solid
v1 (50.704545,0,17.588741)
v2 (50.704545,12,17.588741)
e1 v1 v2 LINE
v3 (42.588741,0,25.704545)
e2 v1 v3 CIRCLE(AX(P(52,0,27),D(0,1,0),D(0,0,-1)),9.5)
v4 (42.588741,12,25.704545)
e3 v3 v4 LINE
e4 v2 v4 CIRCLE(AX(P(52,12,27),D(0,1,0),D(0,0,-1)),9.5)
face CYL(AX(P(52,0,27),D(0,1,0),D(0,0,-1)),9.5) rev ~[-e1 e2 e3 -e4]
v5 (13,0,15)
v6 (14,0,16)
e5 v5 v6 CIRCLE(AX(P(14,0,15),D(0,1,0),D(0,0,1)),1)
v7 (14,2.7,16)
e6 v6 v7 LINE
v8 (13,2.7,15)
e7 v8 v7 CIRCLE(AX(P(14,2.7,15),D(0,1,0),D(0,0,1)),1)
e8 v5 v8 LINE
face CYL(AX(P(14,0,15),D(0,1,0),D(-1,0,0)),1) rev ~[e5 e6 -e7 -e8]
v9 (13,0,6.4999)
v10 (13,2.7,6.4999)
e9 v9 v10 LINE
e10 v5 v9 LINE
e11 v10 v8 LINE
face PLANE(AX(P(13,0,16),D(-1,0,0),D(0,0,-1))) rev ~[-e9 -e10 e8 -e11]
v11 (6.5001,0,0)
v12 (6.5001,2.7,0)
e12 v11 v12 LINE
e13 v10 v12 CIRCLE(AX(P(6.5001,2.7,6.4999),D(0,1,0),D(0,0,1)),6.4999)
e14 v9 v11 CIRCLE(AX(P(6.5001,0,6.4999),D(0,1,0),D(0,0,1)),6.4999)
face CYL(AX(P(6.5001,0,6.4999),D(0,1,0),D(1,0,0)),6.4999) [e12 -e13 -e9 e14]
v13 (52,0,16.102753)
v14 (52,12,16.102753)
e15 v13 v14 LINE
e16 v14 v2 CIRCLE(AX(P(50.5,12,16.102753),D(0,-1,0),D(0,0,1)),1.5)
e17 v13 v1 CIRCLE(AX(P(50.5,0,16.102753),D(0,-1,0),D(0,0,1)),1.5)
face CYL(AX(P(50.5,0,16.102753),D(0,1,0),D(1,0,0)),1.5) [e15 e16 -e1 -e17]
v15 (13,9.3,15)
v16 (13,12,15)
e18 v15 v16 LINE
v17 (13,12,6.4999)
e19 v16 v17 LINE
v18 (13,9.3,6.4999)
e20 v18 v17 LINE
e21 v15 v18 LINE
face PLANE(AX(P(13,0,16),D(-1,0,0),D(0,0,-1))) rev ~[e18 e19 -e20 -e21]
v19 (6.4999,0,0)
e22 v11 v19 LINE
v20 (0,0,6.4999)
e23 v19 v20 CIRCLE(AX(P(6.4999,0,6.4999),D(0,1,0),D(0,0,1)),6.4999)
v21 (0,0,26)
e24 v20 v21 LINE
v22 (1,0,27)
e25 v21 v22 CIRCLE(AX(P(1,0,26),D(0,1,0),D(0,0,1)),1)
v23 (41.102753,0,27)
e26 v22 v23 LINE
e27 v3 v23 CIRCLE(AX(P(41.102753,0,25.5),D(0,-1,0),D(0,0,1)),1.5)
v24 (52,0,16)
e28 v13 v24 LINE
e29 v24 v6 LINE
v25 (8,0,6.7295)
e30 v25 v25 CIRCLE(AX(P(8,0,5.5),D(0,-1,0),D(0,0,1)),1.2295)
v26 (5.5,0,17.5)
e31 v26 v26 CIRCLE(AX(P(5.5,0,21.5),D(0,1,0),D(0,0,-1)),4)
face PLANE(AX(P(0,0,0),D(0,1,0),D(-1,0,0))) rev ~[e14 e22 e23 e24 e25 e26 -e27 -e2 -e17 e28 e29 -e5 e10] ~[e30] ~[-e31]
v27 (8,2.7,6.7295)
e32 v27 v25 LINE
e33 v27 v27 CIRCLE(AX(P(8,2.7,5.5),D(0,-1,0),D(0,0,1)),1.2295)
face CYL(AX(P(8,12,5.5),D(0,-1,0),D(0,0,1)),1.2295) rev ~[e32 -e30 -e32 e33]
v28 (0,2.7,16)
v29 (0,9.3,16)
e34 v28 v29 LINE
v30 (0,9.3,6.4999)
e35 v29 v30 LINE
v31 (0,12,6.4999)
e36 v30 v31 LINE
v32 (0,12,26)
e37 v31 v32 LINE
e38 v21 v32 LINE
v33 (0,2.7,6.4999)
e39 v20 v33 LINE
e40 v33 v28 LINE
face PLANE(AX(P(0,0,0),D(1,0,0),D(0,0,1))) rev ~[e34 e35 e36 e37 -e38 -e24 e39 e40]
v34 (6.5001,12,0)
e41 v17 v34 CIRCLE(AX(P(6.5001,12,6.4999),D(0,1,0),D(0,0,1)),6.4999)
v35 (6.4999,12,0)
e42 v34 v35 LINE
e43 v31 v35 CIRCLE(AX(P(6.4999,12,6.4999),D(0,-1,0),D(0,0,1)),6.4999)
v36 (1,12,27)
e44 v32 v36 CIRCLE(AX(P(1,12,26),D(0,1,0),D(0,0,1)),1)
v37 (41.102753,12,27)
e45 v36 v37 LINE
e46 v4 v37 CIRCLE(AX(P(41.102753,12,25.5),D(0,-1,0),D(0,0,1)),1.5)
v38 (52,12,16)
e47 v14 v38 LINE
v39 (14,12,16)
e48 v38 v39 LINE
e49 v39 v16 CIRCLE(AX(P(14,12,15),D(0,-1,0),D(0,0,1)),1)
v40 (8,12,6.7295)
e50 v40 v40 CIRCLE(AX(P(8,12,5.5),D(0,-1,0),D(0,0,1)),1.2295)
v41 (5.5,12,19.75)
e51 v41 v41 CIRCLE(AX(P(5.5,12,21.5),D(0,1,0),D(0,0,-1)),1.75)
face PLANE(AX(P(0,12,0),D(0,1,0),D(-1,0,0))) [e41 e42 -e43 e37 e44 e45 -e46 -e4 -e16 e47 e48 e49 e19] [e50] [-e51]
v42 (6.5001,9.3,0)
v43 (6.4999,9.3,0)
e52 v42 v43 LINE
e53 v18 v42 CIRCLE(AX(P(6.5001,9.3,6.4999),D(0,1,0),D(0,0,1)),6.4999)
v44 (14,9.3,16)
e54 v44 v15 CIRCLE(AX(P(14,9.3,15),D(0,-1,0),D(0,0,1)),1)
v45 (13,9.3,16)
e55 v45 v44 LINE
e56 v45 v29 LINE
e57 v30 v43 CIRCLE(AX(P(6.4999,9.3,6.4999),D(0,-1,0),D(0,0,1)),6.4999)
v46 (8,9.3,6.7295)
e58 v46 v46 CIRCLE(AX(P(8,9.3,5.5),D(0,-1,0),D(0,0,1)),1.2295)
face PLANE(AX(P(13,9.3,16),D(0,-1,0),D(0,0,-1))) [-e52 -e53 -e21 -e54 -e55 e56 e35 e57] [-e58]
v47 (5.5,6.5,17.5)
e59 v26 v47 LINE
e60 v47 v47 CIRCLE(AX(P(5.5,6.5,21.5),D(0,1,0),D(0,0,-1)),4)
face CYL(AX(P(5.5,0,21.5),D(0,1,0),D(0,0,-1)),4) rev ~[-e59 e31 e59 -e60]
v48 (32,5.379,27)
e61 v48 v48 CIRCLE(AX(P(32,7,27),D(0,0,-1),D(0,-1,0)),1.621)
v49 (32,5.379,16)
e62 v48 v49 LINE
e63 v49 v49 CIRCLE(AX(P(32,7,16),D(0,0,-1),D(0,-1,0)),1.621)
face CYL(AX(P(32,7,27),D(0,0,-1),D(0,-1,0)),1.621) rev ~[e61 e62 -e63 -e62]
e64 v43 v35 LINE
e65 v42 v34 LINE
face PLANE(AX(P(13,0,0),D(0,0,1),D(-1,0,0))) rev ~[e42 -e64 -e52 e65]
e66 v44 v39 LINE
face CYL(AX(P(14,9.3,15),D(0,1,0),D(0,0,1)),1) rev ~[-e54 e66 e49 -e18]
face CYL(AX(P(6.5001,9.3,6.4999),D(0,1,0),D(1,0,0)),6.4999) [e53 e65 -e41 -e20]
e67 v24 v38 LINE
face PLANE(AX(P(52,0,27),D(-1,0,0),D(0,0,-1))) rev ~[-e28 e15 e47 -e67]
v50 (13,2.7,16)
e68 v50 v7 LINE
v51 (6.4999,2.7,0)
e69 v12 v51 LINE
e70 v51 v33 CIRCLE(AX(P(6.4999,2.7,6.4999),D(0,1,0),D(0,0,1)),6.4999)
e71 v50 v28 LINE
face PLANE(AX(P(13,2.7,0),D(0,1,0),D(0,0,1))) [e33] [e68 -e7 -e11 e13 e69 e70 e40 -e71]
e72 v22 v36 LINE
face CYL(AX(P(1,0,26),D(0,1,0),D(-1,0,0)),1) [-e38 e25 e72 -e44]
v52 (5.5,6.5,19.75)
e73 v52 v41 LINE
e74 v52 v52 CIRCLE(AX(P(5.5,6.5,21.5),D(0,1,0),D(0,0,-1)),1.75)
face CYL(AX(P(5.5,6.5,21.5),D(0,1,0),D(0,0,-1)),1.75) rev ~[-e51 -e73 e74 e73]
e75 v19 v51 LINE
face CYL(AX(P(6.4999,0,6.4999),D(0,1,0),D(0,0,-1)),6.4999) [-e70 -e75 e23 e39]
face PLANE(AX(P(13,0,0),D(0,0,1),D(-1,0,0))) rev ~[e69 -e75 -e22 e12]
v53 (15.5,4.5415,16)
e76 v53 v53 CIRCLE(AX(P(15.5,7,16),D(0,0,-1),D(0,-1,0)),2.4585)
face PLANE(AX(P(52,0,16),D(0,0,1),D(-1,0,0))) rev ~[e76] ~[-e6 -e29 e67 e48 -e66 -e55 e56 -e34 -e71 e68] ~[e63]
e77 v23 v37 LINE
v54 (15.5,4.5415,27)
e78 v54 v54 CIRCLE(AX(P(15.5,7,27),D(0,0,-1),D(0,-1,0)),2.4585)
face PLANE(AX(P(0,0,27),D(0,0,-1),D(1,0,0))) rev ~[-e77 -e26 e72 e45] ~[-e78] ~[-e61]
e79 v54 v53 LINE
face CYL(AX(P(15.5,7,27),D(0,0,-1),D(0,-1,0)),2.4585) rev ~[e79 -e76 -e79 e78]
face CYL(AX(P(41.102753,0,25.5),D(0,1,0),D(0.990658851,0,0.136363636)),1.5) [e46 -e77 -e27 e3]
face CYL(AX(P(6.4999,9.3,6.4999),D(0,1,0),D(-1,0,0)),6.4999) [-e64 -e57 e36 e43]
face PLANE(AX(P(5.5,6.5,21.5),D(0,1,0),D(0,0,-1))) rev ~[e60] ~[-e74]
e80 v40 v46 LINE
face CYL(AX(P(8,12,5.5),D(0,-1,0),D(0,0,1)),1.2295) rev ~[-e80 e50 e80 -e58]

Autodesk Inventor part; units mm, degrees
ref_plane "YZ Plane" through (0, 0, 0) normal (1, 0, 0) x (0, 1, 0)
ref_plane "XZ Plane" through (0, 0, 0) normal (0, 1, 0) x (-1, 0, 0)
ref_plane "XY Plane" through (0, 0, 0) normal (0, 0, 1) x (1, 0, 0)
sketch "Sketch1" plane through (0, 0, 0) normal (0, 1, 0) x (-1, 0, 0)
  line L0 (0, 0) -> (0, 27)
  line L1 (0, 27) -> (-52, 27)
  line L2 (-52, 27) -> (-52, 16)
  line L3 (-52, 16) -> (-13, 16)
  line L4 (-13, 16) -> (-13, 0)
  line L5 (-13, 0) -> (0, 0)
  dimension "d0" = 27
  dimension "d1" = 52
  dimension "d2" = 11
  dimension "d3" = 39
  dimension "d57" = 16
extrude "Extrusion1" add sketch "Sketch1" along normal blind 12
sketch "Sketch2" plane through (0, 0, 0) normal (0, -1, 0) x (1, 0, 0)
  line L0 (0, 0) -> (0, 27) projected
  line L1 (0, 27) -> (52, 27) projected
  point P0 (5.5, 21.5)
  dimension "d6" = 5.5
  dimension "d7" = 5.5
hole "Hole1" at (5.5, 0, 21.5) direction (0, 1, 0) diameter 3.5 end through all counterbore diameter 8 counterbore depth 6.5
sketch "Sketch3" plane through (0, 12, 0) normal (0, 1, 0) x (1, 0, 0)
  line L0 (0, 0) -> (0, -27) projected
  line L1 (13, 0) -> (0, 0) projected
  point P0 (8, -5.5)
  dimension "d15" = 8
  dimension "d16" = 5.5
hole "Hole2" at (8, 12, 5.5) direction (0, -1, 0) diameter 2.459 end through all thread size "M3x0.5" class "6H" standard "ISO Metric profile"
sketch "Sketch4" plane through (13, 0, 16) normal (1, 0, 0) x (0, 0, -1)
  line L0 (0, 0) -> (0, 12) projected
  line L1 (16, 2.7) -> (0, 2.7)
  line L2 (0, 2.7) -> (0, 9.3)
  line L3 (0, 9.3) -> (16, 9.3)
  line L4 (16, 9.3) -> (16, 2.7)
  line L5 (0, 0) -> (16, 0) projected
  line L6 (0, 12) -> (16, 12) projected
  dimension "d58" = 12
  dimension "d59" = 6.6
  dimension "d60" = 2.7
extrude "Extrusion2" cut sketch "Sketch4" against normal through all
sketch "Sketch5" plane through (0, 0, 27) normal (0, 0, 1) x (1, 0, 0)
  line L0 (0, 0) -> (52, 0) projected
  line L1 (0, 0) -> (0, 12) projected
  point P0 (15.5, 7)
  dimension "d28" = 7
  dimension "d29" = 15.5
hole "Hole3" at (15.5, 7, 27) direction (0, 0, -1) diameter 4.917 end through all thread size "M6x1" class "6H" standard "ISO Metric profile"
sketch "Sketch6" plane through (0, 0, 27) normal (0, 0, 1) x (1, 0, 0)
  line L0 (0, 0) -> (52, 0) projected
  line L1 (0, 0) -> (0, 12) projected
  point P0 (32, 7)
  dimension "d37" = 7
  dimension "d38" = 32
hole "Hole4" at (32, 7, 27) direction (0, 0, -1) diameter 3.242 end through all thread size "M4x0.7" class "6H" standard "ISO Metric profile"
sketch "Sketch7" plane through (0, 0, 0) normal (0, -1, 0) x (1, 0, 0)
  line L0 (0, 27) -> (52, 27) projected
  point P0 (0, 0)
hole "Hole5" at (52, 0, 27) direction (0, 1, 0) diameter 19 end through all
fillet "Fillet1" radius 1.5 2 edges at (42.5, 6, 27) (52, 6, 17.5)
fillet "Fillet2" radius 6.5 4 edges at (13, 1.35, 0) (13, 10.65, 0) (0, 10.65, 0) (0, 1.35, 0)
fillet "Fillet3" radius 1 1 edges at (0, 6, 27)
fillet "Fillet4" radius 1 2 edges at (13, 1.35, 16) (13, 10.65, 16)
equation "\"d60\" = -0.5 * d59 + 0.5 * d58"
